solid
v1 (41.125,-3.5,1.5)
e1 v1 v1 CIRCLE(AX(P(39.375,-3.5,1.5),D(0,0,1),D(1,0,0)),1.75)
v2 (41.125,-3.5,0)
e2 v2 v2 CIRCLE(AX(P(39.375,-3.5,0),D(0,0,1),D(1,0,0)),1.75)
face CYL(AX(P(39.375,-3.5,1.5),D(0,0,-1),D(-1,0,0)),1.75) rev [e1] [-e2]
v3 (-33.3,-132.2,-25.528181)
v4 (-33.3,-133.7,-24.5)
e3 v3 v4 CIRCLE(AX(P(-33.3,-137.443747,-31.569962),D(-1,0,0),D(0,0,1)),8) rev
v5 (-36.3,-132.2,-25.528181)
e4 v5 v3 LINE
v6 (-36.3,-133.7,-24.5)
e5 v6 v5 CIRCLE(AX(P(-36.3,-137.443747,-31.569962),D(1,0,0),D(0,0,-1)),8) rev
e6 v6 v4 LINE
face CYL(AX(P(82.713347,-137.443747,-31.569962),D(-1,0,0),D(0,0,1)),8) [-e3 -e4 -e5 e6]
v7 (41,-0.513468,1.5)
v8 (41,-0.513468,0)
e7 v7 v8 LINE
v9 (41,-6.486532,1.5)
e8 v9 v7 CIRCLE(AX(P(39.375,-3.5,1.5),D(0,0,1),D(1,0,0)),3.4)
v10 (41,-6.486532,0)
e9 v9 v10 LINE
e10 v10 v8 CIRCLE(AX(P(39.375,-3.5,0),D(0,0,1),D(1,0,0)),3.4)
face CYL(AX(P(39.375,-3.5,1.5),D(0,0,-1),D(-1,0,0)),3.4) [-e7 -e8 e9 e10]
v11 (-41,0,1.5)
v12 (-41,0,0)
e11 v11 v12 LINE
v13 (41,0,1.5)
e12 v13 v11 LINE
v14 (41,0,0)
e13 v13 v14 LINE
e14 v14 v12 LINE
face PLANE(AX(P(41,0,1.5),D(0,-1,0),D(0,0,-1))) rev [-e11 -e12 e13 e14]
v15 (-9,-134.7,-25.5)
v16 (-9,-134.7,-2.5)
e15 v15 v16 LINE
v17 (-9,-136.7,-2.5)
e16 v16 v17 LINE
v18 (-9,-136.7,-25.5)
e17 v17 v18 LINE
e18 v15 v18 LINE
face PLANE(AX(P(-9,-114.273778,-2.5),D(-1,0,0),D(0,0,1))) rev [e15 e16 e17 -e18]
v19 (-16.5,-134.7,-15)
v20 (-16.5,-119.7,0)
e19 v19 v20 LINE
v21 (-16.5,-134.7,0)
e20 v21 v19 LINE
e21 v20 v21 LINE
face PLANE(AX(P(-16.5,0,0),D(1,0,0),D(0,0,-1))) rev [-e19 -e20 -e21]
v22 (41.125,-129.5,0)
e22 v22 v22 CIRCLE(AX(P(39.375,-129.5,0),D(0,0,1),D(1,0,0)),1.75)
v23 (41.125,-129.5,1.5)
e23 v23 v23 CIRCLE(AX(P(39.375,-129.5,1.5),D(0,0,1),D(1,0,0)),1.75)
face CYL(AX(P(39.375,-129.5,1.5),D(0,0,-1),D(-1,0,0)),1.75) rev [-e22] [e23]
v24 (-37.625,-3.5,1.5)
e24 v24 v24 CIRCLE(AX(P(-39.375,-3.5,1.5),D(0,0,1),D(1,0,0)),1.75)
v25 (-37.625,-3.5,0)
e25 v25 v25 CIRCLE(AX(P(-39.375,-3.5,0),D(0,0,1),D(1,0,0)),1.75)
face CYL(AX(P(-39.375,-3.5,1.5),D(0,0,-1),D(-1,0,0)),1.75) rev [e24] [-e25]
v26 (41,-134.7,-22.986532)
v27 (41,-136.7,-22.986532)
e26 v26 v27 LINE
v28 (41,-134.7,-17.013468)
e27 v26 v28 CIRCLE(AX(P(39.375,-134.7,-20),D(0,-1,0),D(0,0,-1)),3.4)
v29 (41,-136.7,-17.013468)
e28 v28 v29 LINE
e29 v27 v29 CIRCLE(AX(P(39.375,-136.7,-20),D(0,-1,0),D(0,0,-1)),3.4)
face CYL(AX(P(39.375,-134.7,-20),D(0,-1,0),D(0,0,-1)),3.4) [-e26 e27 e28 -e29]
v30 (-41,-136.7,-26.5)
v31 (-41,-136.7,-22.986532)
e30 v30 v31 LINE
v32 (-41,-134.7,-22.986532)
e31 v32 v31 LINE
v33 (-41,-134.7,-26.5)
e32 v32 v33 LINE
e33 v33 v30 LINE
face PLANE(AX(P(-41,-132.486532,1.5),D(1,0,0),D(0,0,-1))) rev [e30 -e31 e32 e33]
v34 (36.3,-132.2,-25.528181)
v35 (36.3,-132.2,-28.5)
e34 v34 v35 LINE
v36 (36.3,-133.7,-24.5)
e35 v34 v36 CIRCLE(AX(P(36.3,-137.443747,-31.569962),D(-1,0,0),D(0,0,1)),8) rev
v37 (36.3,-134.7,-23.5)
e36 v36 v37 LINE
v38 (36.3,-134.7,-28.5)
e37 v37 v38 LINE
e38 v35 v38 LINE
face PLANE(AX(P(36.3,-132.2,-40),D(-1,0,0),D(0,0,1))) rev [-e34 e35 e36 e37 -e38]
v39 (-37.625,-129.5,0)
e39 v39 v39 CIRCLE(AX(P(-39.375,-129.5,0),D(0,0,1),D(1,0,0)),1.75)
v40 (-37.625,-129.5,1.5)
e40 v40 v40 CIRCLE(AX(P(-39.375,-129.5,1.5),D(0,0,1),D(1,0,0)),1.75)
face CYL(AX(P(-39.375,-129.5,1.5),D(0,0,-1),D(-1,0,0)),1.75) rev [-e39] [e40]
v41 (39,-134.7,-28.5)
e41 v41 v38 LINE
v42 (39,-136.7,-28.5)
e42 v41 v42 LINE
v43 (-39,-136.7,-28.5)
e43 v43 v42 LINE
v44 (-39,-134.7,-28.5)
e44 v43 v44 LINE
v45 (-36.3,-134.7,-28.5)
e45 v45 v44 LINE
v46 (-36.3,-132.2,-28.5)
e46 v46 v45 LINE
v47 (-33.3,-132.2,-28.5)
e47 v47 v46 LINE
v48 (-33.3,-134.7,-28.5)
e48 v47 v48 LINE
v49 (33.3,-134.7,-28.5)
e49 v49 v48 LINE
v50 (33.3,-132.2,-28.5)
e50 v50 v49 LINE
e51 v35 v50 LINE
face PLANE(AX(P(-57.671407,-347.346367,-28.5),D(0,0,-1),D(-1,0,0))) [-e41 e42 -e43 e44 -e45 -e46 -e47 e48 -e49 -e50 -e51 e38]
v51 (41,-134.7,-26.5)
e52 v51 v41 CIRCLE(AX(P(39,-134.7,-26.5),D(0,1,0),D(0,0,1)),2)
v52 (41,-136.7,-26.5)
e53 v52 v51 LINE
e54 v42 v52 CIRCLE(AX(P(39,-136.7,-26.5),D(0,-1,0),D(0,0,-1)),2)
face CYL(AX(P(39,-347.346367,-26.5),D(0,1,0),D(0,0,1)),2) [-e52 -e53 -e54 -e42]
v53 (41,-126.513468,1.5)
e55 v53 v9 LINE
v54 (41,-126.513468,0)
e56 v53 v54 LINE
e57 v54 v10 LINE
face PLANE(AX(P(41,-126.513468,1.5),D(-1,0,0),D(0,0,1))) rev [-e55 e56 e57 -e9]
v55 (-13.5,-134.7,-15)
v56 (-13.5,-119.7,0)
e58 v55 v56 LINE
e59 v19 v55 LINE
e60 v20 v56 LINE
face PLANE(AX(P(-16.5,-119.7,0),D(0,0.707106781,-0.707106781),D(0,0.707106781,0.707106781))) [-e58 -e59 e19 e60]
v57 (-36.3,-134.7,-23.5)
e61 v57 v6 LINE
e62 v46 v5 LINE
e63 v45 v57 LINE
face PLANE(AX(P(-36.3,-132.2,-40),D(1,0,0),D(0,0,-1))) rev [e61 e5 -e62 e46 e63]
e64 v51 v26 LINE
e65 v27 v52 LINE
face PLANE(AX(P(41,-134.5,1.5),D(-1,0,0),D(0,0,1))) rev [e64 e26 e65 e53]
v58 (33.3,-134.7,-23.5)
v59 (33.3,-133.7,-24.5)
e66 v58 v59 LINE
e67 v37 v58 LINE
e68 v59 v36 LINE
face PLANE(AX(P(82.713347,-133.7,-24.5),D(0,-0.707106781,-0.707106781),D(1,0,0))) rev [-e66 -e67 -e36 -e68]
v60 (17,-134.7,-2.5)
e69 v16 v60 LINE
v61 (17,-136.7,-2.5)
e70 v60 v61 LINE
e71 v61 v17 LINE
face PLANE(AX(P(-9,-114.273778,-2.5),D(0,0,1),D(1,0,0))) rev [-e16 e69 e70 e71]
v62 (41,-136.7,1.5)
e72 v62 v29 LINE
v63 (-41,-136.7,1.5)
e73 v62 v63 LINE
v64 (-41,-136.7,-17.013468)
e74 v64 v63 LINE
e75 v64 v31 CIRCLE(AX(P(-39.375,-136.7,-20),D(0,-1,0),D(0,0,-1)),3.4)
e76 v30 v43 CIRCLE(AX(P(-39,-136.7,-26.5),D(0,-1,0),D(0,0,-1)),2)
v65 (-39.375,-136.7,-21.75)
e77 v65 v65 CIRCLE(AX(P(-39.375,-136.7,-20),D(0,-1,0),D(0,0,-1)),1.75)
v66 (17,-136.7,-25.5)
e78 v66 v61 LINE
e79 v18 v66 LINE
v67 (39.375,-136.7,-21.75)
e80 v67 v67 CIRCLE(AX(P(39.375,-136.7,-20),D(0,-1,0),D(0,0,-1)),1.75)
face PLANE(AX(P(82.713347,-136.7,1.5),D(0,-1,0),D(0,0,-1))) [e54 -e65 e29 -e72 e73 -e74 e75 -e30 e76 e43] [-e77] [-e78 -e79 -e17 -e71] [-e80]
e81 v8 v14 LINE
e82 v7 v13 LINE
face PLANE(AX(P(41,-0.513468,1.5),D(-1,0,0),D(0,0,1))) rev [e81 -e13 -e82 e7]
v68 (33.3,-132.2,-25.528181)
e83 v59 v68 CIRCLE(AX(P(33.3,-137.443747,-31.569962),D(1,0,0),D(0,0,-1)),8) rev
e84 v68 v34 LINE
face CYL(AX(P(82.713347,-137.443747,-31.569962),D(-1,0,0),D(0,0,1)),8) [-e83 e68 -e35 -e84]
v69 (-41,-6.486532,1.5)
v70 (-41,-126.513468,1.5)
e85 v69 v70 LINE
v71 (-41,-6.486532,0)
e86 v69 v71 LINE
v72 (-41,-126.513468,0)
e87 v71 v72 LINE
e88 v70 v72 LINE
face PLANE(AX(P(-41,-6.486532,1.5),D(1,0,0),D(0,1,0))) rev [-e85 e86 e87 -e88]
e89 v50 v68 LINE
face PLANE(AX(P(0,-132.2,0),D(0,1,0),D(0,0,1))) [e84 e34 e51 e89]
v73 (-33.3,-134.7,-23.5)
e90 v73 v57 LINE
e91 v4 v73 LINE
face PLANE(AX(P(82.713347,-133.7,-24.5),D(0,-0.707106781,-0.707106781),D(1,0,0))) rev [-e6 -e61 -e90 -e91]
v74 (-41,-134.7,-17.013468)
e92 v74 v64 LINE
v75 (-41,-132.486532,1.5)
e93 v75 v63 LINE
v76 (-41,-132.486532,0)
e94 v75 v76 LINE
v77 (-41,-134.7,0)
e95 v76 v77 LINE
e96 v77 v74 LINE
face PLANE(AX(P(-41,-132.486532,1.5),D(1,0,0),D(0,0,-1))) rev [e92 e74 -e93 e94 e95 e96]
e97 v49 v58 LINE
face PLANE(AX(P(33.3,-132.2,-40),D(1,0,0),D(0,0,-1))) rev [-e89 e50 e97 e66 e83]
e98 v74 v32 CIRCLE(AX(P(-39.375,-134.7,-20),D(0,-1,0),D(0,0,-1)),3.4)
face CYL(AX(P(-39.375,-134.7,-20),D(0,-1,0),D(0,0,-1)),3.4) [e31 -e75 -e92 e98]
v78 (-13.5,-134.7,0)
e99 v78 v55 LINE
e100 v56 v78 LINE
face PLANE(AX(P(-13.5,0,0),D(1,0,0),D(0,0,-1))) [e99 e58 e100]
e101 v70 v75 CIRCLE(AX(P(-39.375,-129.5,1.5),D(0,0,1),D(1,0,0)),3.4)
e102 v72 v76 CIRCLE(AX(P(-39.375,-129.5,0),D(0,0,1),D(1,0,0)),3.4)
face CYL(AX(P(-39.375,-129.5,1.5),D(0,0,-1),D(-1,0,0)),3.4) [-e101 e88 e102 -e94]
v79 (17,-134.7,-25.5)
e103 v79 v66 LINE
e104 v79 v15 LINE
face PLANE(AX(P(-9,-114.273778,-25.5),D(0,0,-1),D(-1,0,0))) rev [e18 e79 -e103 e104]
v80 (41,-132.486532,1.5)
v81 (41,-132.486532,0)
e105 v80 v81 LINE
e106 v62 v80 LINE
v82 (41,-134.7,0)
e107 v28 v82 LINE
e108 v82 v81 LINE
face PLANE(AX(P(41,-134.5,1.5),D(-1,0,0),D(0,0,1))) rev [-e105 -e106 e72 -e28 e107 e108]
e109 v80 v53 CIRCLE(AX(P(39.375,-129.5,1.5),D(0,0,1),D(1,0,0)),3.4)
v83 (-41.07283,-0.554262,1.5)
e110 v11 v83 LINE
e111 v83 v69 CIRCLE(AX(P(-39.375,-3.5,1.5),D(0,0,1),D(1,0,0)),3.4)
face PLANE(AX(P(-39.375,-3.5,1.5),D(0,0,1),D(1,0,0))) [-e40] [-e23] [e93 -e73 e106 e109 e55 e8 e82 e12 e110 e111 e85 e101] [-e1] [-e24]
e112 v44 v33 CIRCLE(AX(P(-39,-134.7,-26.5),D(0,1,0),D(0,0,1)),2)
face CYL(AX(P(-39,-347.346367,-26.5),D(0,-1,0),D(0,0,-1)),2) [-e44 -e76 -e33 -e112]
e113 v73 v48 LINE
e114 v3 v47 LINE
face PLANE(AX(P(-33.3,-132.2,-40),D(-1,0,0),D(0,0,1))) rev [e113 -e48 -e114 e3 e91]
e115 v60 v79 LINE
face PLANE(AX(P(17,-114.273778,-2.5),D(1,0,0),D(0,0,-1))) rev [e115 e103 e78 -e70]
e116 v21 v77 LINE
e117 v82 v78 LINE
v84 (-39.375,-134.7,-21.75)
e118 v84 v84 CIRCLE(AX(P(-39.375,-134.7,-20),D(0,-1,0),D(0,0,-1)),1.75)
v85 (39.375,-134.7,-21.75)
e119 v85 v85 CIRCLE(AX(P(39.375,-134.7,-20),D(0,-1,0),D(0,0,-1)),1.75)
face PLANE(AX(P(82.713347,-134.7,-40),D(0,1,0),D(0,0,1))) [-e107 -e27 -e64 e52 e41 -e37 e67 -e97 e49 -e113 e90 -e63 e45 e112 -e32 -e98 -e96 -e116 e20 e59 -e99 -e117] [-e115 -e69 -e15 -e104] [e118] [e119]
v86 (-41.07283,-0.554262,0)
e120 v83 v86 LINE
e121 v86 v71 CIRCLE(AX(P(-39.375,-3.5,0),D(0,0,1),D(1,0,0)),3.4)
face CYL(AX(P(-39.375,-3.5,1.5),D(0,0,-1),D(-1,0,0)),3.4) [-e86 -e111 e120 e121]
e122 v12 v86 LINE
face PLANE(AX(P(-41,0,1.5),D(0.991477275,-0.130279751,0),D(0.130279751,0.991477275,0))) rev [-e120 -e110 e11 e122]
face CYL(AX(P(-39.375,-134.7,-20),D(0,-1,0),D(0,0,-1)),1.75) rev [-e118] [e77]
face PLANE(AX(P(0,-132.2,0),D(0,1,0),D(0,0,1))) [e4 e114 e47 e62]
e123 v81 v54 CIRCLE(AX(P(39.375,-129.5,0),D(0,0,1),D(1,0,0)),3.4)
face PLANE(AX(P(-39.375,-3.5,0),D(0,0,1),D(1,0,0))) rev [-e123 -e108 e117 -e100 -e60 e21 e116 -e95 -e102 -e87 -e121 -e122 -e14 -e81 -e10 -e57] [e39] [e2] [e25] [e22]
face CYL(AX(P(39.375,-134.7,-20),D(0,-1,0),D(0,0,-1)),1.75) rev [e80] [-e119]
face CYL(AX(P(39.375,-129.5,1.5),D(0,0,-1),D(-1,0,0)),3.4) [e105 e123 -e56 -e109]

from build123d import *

# Parameters (mm, degrees)
SKETCH1_R                = 1.75
BOSS_EXTRUDE1_DEPTH      = 1.5
BOSS_EXTRUDE2_DEPTH      = 82
BOSS_EXTRUDE3_DEPTH      = 1.5
BOSS_EXTRUDE3_DEPTH_BACK = 1.5
BOSS_EXTRUDE4_DEPTH      = 2
SKETCH5_R                = 1.75
CUT_EXTRUDE1_DEPTH       = 2
CUT_EXTRUDE2_DEPTH       = 149.716477315
CUT_EXTRUDE2_DEPTH_BACK  = 149.716477315
SKETCH6_W                = 82
SKETCH6_H                = 11.5
BOSS_EXTRUDE6_START      = -2
SKETCH7_W                = 3
SKETCH7_H                = 4
BOSS_EXTRUDE6_DEPTH      = 2.5
FILLET1_R                = 2
CHAMFER1_SIZE            = 1
FILLET2_R                = 8
SKETCH8_W                = 26
SKETCH8_H                = 23
CUT_EXTRUDE3_DEPTH       = 22.4262221


with BuildPart() as part:
    # Sketch1 → Boss-Extrude1 (new body)
    with BuildSketch(Plane.XY):
        with BuildLine():
            Line((-37.75, -134.5), (37.75, -134.5))
            Line((37.75, -134.5), (41, -134.5))
            Line((41, -134.5), (41, -132.48653227))
            ThreePointArc((41, -132.48653227), (42.775, -129.5), (41, -126.51346773))
            Line((41, -126.51346773), (41, -6.48653227))
            ThreePointArc((41, -6.48653227), (42.775, -3.5), (41, -0.51346773))
            Line((41, -0.51346773), (41, 0))
            Line((41, 0), (-41, 0))
            Line((-41, 0), (-41.072829787, -0.55426172))
            ThreePointArc((-41.072829787, -0.55426172), (-42.774743802, -3.541738254), (-41, -6.48653227))
            Line((-41, -6.48653227), (-41, -126.51346773))
            ThreePointArc((-41, -126.51346773), (-42.775, -129.5), (-41, -132.48653227))
            Line((-41, -132.48653227), (-41, -134.5))
            Line((-41, -134.5), (-37.75, -134.5))
        make_face()
        with Locations((-39.375, -129.5)):
            Circle(SKETCH1_R, mode=Mode.SUBTRACT)
        with Locations((39.375, -129.5)):
            Circle(SKETCH1_R, mode=Mode.SUBTRACT)
        with Locations((39.375, -3.5)):
            Circle(SKETCH1_R, mode=Mode.SUBTRACT)
        with Locations((-39.375, -3.5)):
            Circle(SKETCH1_R, mode=Mode.SUBTRACT)
    extrude(amount=BOSS_EXTRUDE1_DEPTH)

    # Sketch2 → Boss-Extrude2 (add)
    with BuildSketch(Plane.ZY.offset(41)):
        Polygon((1.5, -134.5), (1.5, -136.7), (-40, -136.7), (-40, -134.7), (0, -134.7), (0, -134.5), (0, -132.48653227), (1.5, -132.48653227), align=None)
    extrude(amount=-BOSS_EXTRUDE2_DEPTH)

    # Sketch3 → Boss-Extrude3 (add, two sides: drawn at the far end of the back side and taken through both)
    with BuildSketch(Plane(origin=(-15, 0, 0), x_dir=(0, 0, -1), z_dir=(1, 0, 0)).offset(-BOSS_EXTRUDE3_DEPTH_BACK)):
        Polygon((0, -119.7), (15, -134.7), (0, -134.7), align=None)
    extrude(amount=BOSS_EXTRUDE3_DEPTH + BOSS_EXTRUDE3_DEPTH_BACK)

    # Sketch4 → Boss-Extrude4 (add)
    with BuildSketch(Plane.XZ.offset(136.7)):
        with BuildLine():
            Line((-41, -17.01346773), (-41, -22.98653227))
            ThreePointArc((-41, -22.98653227), (-42.775, -20), (-41, -17.01346773))
        make_face()
        with BuildLine():
            Line((41, -17.01346773), (41, -22.98653227))
            ThreePointArc((41, -22.98653227), (42.775, -20), (41, -17.01346773))
        make_face()
    extrude(amount=-BOSS_EXTRUDE4_DEPTH)

    # Sketch5 → Cut-Extrude1 (cut)
    with BuildSketch(Plane.XZ.offset(136.7)):
        with Locations(Location((39.375, -20, 0), (0, 0, 270))):
            Circle(SKETCH5_R)
        with Locations(Location((-39.375, -20, 0), (0, 0, 270))):
            Circle(SKETCH5_R)
    extrude(amount=-CUT_EXTRUDE1_DEPTH, mode=Mode.SUBTRACT)

    # Sketch6 → Cut-Extrude2 (cut, two sides: drawn at the far end of the back side and taken through both)
    with BuildSketch(Plane.XZ.offset(136.7).offset(-CUT_EXTRUDE2_DEPTH_BACK)):
        with Locations((0, -34.25)):
            Rectangle(SKETCH6_W, SKETCH6_H)
    extrude(amount=CUT_EXTRUDE2_DEPTH + CUT_EXTRUDE2_DEPTH_BACK, mode=Mode.SUBTRACT)

    # Sketch7 → Boss-Extrude6 (add)
    with BuildSketch(Plane.XZ.offset(136.7).offset(BOSS_EXTRUDE6_START)):
        with Locations((-34.8, -26.5)):
            Rectangle(SKETCH7_W, SKETCH7_H)
        with Locations((34.8, -26.5)):
            Rectangle(SKETCH7_W, SKETCH7_H)
    extrude(amount=-BOSS_EXTRUDE6_DEPTH)

    # Fillet1
    fillet1_edges = [part.edges().sort_by_distance(p)[0] for p in [
        (41, -135.7, -28.5),
        (-41, -135.7, -28.5),
    ]]
    fillet(fillet1_edges, radius=FILLET1_R)

    # Chamfer1
    chamfer1_edges = [part.edges().sort_by_distance(p)[0] for p in [
        (-34.8, -134.7, -24.5),
        (-34.8, -132.2, -24.5),
        (34.8, -134.7, -24.5),
        (34.8, -132.2, -24.5),
    ]]
    chamfer(chamfer1_edges, length=CHAMFER1_SIZE)

    # Fillet2
    # the kernel refuses this fillet: 8 mm, written as the material it takes off along each edge
    with BuildSketch(Plane(origin=(-28.303909917, -133.2, -24.5), x_dir=(0, -1.0, -1.118394266079786e-11), z_dir=(-1, 0, 0))) as fillet2_piece_1:
        with BuildLine():
            CenterArc((4.243746579, -7.06996192), FILLET2_R, 117.902496562, 17.097503438)
            Line((-1.413107671, -1.413107671), (0, 0))
            Line((0, 0), (0.5, 0))
        make_face()
    extrude(amount=12.992180166, mode=Mode.SUBTRACT)
    with BuildSketch(Plane(origin=(28.303909917, -133.2, -24.5), x_dir=(0, 0.7071067811865501, -0.7071067811865448), z_dir=(1, 0, 0))) as fillet2_piece_2:
        with BuildLine():
            CenterArc((1.998436033, -8), FILLET2_R, 90, 17.097503438)
            Line((-0.353553391, -0.353553391), (0, 0))
            Line((0, 0), (1.998436033, 0))
        make_face()
    extrude(amount=12.992180166, mode=Mode.SUBTRACT)

    # Sketch8 → Cut-Extrude3 (cut)
    with BuildSketch(Plane.XZ.offset(136.7)):
        with Locations((4, -14)):
            Rectangle(SKETCH8_W, SKETCH8_H)
    extrude(amount=-CUT_EXTRUDE3_DEPTH, mode=Mode.SUBTRACT)


solid = part.part
